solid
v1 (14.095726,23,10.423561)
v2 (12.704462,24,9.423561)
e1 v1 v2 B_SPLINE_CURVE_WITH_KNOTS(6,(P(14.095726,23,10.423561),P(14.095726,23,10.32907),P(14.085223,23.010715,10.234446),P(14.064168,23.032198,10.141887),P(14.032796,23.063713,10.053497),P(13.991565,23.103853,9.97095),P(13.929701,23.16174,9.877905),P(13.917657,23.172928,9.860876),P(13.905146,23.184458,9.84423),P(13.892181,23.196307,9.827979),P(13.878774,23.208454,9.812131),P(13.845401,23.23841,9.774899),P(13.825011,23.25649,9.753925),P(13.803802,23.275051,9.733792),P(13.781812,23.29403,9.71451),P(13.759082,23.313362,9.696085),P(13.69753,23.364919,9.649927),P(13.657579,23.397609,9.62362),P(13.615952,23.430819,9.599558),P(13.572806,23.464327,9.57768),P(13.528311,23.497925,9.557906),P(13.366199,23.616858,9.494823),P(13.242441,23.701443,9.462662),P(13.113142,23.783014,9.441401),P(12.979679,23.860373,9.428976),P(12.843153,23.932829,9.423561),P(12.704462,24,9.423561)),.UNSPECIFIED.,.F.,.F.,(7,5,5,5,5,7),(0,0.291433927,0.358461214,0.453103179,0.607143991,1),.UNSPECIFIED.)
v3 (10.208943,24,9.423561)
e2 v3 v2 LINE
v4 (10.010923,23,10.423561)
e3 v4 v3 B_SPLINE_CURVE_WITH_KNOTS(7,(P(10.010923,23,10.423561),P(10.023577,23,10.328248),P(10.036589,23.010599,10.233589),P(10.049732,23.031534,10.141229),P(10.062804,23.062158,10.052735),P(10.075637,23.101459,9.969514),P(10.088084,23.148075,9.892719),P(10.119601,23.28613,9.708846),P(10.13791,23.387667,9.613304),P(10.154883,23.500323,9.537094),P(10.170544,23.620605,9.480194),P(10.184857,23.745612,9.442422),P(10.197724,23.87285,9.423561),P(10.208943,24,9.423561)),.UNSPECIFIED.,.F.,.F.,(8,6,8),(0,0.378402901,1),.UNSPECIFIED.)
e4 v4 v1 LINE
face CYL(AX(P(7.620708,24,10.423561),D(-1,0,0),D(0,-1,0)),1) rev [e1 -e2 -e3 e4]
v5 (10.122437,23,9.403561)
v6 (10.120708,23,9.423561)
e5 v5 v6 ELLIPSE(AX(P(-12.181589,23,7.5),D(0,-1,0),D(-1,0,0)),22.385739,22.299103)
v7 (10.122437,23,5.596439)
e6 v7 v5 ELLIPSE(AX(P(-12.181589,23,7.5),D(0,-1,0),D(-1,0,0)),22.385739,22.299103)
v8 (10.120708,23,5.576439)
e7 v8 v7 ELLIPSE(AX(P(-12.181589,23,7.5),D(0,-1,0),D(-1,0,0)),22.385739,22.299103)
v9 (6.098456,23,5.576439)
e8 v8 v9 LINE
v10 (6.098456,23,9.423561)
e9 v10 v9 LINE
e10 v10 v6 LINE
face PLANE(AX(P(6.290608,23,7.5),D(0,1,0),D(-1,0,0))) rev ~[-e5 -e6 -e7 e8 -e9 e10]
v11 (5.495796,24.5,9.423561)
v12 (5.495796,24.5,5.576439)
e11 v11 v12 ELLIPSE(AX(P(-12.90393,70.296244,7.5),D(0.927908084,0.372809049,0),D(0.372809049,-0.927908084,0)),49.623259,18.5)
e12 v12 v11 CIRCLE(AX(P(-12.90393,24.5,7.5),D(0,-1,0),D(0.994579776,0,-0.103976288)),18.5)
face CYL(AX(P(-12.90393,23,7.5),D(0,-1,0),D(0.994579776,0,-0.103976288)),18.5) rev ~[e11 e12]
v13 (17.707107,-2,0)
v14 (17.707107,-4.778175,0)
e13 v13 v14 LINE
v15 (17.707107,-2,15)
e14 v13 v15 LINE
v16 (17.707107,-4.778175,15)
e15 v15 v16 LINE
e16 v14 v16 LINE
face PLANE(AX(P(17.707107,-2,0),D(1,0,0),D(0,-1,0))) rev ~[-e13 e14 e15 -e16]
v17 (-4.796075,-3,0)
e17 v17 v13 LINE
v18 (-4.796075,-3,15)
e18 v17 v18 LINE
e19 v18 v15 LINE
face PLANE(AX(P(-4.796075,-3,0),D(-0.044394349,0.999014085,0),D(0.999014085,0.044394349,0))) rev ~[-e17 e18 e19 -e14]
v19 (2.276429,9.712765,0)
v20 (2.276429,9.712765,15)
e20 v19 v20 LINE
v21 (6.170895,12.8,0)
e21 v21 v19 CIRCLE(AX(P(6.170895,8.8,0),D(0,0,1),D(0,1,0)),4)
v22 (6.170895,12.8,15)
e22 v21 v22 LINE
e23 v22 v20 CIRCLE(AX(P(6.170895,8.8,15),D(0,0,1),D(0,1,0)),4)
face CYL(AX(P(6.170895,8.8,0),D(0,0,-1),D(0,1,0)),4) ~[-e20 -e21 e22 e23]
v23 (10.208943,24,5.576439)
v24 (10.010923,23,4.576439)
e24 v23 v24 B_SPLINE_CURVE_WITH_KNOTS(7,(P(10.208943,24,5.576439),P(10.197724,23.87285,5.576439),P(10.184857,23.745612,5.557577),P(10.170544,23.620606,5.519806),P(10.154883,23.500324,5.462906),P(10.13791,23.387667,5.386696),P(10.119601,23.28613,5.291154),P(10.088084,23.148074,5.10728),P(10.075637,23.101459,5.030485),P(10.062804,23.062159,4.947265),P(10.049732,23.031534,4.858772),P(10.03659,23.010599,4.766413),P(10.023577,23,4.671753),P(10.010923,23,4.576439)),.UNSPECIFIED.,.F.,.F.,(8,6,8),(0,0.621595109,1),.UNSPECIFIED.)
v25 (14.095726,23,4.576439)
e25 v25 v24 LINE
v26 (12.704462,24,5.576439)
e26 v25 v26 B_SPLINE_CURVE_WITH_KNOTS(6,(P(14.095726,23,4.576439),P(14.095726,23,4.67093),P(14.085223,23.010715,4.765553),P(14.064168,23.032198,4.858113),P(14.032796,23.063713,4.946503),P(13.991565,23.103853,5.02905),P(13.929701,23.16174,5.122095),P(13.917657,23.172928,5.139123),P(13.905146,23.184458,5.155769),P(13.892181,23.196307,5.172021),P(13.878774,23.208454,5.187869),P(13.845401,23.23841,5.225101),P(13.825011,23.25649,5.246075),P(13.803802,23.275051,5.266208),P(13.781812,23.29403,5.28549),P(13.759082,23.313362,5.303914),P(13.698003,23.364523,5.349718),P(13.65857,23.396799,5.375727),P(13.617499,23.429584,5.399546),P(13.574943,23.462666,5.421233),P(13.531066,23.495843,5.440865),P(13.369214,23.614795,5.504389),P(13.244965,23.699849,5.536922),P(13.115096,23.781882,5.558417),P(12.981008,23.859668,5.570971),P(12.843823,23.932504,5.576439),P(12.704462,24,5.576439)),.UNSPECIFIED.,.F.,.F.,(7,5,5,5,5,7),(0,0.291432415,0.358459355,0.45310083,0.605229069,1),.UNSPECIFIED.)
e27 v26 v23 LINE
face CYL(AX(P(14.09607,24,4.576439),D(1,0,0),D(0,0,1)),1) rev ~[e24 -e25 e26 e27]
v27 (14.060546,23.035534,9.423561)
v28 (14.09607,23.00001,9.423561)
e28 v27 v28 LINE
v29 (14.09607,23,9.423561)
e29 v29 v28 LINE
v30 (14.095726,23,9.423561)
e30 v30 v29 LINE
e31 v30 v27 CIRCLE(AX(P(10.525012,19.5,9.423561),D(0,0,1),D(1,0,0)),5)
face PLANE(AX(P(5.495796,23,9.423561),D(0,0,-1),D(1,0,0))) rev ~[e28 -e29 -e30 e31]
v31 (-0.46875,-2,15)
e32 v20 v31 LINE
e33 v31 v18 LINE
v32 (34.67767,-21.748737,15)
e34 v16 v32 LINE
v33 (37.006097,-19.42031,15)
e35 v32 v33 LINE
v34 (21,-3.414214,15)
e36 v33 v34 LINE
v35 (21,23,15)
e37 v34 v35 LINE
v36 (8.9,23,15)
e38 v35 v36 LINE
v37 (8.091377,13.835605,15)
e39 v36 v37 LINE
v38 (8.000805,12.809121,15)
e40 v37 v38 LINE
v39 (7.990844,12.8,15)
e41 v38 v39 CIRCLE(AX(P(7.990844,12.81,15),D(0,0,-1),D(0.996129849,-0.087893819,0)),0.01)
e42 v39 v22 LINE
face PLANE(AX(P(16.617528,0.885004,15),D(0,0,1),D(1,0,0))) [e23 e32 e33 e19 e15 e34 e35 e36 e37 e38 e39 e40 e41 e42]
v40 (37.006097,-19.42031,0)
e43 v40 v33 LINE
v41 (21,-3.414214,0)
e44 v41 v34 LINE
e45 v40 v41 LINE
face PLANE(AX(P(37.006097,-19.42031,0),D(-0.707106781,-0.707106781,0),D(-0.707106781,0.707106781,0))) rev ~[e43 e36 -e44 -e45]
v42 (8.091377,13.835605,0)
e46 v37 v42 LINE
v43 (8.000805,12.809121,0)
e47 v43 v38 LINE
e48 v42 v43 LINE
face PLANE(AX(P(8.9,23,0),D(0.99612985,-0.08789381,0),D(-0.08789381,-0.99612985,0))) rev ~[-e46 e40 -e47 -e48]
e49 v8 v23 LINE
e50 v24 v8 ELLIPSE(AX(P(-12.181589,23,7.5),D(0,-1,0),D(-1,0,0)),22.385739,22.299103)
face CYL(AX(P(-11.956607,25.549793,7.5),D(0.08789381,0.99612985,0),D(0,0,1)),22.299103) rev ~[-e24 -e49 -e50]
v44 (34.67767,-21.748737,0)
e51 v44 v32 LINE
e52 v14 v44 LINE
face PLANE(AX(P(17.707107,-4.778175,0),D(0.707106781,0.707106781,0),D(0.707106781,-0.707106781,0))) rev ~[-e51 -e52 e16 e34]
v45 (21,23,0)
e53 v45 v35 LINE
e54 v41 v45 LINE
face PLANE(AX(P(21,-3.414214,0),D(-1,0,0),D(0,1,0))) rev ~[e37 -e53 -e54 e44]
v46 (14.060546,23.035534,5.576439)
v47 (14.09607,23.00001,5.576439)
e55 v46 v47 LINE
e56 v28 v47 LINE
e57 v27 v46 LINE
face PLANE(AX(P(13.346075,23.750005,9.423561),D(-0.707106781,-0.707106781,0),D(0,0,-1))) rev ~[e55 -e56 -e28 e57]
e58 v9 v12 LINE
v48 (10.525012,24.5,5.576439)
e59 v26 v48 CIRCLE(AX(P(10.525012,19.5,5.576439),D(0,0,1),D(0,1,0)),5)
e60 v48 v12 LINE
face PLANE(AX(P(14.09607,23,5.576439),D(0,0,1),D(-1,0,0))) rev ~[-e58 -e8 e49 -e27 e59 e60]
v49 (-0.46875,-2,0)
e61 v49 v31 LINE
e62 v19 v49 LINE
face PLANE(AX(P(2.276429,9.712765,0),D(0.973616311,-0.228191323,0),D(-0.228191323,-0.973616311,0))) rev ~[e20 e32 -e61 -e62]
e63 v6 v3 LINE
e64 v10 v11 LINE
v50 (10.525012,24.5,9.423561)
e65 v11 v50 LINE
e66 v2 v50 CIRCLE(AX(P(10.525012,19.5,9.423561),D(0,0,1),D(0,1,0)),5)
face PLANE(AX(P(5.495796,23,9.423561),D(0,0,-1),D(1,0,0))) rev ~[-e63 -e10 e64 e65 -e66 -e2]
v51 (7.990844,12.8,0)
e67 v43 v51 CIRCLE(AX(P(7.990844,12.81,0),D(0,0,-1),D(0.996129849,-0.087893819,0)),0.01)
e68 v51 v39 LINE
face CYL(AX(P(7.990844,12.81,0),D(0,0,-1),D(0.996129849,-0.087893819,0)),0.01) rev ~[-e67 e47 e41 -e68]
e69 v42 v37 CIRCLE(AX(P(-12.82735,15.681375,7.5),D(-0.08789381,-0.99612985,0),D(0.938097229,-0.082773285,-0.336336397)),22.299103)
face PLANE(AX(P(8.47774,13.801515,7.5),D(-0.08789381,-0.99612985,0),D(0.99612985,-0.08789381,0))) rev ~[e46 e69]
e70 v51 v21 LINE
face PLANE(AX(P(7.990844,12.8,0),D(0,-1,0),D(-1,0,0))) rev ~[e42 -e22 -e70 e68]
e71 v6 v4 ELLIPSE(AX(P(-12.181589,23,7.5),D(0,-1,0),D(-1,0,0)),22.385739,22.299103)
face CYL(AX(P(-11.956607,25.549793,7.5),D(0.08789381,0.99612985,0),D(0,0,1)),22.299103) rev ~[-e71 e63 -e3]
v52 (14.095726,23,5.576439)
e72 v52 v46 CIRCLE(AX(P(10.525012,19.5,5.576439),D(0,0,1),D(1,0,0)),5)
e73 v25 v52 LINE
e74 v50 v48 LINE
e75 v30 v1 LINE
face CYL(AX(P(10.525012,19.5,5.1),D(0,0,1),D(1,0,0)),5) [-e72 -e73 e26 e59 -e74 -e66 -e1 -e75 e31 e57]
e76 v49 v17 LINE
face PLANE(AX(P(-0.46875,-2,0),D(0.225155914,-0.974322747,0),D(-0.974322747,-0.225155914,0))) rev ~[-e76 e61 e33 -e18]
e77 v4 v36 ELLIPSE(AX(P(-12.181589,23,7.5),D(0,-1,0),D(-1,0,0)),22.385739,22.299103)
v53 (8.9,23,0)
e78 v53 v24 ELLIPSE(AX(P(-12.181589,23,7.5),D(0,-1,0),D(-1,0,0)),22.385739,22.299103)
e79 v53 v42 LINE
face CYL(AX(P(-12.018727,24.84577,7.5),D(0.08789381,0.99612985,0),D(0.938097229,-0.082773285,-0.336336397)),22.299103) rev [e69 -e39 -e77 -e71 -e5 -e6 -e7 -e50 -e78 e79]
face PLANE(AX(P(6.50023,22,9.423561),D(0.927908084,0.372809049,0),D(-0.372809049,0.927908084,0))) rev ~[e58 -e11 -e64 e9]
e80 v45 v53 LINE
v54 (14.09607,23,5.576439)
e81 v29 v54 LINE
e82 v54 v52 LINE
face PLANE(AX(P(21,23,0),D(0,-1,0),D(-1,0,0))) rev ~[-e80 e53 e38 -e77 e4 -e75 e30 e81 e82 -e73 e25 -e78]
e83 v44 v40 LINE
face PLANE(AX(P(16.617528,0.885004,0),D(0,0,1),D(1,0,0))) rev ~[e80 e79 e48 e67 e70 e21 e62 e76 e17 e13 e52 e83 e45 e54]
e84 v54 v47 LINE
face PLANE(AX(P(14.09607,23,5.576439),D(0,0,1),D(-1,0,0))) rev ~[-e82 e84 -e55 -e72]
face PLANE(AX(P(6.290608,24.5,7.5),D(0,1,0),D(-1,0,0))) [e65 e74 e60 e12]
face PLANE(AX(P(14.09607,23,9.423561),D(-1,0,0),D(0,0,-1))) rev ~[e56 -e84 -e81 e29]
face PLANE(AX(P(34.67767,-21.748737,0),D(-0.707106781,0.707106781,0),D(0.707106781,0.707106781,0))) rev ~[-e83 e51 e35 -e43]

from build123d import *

# Parameters (mm, degrees)
F1_DEPTH      = 15
F4_DEPTH      = 9.2
F4_DEPTH_BACK = 1
F7_DEPTH      = 1.5
F8_SIZE       = 1.49999
F9_R          = 5
F11_DEPTH     = 4
F12_T4_DEPTH  = 6.4753623201
F12_S5_R      = 22.299103121
F12_T6_DEPTH  = 5
F12_S8_R      = 5
F12_T9_DEPTH  = 5
F12_T13_DEPTH = 6.4753623415
F12_S15_R     = 5
F12_T16_DEPTH = 5
F12_S17_R     = 22.299103121
F12_T18_DEPTH = 5


# Not quite as in the source:
# - a fillet or chamfer that OpenCascade refuses, or shapes differently, is made with other operations: its cross-section is extruded or revolved along the edge and cut away or added
# - a fillet or chamfer is up to 0.001 mm smaller than in the source, because OpenCascade refuses the exact size


with BuildPart() as f1:
    # F0 (on Top) → F1 (new body)
    with BuildSketch(Plane.XY):
        with BuildLine():
            Line((37.0060966544, -19.4203102168), (21, -3.4142135624))
            Line((21, -3.4142135624), (21, 23))
            Line((21, 23), (8.9, 23))
            Line((8.9, 23), (8.0008047996, 12.8091210619))
            ThreePointArc((8.0008047996, 12.8091210619), (7.9975966714, 12.8026247244), (7.9908435011, 12.8))
            Line((7.9908435011, 12.8), (6.1708946074, 12.8))
            ThreePointArc((6.1708946074, 12.8), (3.6860466407, 11.9345702389), (2.2764293651, 9.7127652912))
            Line((2.2764293651, 9.7127652912), (-0.46875, -2))
            Line((-0.46875, -2), (-4.7960747033, -3))
            Line((-4.7960747033, -3), (17.7071067812, -2))
            Line((17.7071067812, -2), (17.7071067812, -4.7781745931))
            Line((17.7071067812, -4.7781745931), (34.6776695297, -21.7487373415))
            Line((34.6776695297, -21.7487373415), (37.0060966544, -19.4203102168))
        make_face()
    extrude(amount=F1_DEPTH)

    # F3 (on face) → F4 (cut, two sides)
    with BuildSketch(Plane(origin=(2.0824892704, 23.6015450644, 0), x_dir=(0.99612985, -0.0878938103, 0), z_dir=(-0.0878938103, -0.99612985, 0))) as f4_sk:
        with BuildLine():
            Line((6.8439980284, 15), (6.8439980284, 0))
            ThreePointArc((6.8439980284, 0), (8.1431011494, 7.5), (6.8439980284, 15))
        make_face()
    extrude(amount=F4_DEPTH, mode=Mode.SUBTRACT)
    extrude(f4_sk.sketch, amount=-F4_DEPTH_BACK, mode=Mode.SUBTRACT)

    # F6 (on offset) → F7 (join)
    with BuildSketch(Plane(origin=(0, 23, 0), x_dir=(-1, 0, 0), z_dir=(0, 1, 0))):
        with BuildLine():
            ThreePointArc((-7.0033527857, 9.4235612132), (-7.0960699027, 7.4999998768), (-7.0033527857, 5.5764385404))
            Line((-7.0033527857, 5.5764385404), (-5.4957957644, 5.5764385404))
            ThreePointArc((-5.4957957644, 5.5764385404), (-5.5960699027, 7.4999998768), (-5.4957957644, 9.4235612132))
            Line((-5.4957957644, 9.4235612132), (-7.0033527857, 9.4235612132))
        make_face()
        with BuildLine():
            Line((-14.0960699027, 7.4999998768), (-14.0960699027, 5.5764385404))
            Line((-14.0960699027, 5.5764385404), (-7.0033527857, 5.5764385404))
            ThreePointArc((-7.0033527857, 5.5764385404), (-7.0960699027, 7.4999998768), (-7.0033527857, 9.4235612132))
            Line((-7.0033527857, 9.4235612132), (-14.0960699027, 9.4235612132))
            Line((-14.0960699027, 9.4235612132), (-14.0960699027, 7.4999998768))
        make_face()
    extrude(amount=F7_DEPTH)

    # F8 (size 1.5 in the source; OpenCascade refuses exactly that, so slightly less here)
    f8_edges = [f1.edges().sort_by_distance(p)[0] for p in [
        (14.09607, 24.5, 7.5),
    ]]
    chamfer(f8_edges, length=F8_SIZE)

    # F9
    f9_edges = [f1.edges().sort_by_distance(p)[0] for p in [
        (12.59608, 24.5, 7.5),
    ]]
    fillet(f9_edges, radius=F9_R)

    # F10 (on face) → F11 (cut)
    with BuildSketch(Plane.XY.offset(9.4235612132)):
        Polygon((5.4957957644, 22), (6.5002299745, 22), (5.4957957644, 24.5), align=None)
    extrude(amount=-F11_DEPTH, mode=Mode.SUBTRACT)

    # F12: fillet of radius 1 on 3 edges, made by hand


with BuildPart() as f12_tool2:
    # F12_s3 → F12_t4 (new body)
    with BuildSketch(Plane.YZ.offset(7.6207075826)):
        with BuildLine():
            ThreePointArc((23, 10.4235612132), (23.2928932188, 9.716454432), (24, 9.4235612132))
            Line((24, 9.4235612132), (24, 9.4035612132))
            Line((24, 9.4035612132), (22.98, 9.4035612132))
            Line((22.98, 9.4035612132), (22.98, 10.4235612132))
            Line((22.98, 10.4235612132), (23, 10.4235612132))
        make_face()
    extrude(amount=F12_T4_DEPTH)

    # F12_s5 → F12_t6 (cut, symmetric)
    with BuildSketch(Plane(origin=(2.1446089712, 24.3055683406, 0), x_dir=(0, 0, 1), z_dir=(0.0878938103, 0.99612985, 0))):
        with Locations((7.5, -14.1560019716)):
            Circle(F12_S5_R)
    extrude(amount=F12_T6_DEPTH, both=True, mode=Mode.SUBTRACT)

    split(bisect_by=Plane.XZ.offset(-23), keep=Keep.BOTTOM)

    # F12_s8 → F12_t9 (intersect, symmetric)
    with BuildSketch(Plane.XY.offset(9.9)):
        with Locations((10.5250120908, 19.5)):
            Circle(F12_S8_R)
    extrude(amount=F12_T9_DEPTH, both=True, mode=Mode.INTERSECT)


with BuildPart() as f1_1:
    add(f1.part)

    # F12_t1: union F12_tool2
    add(f12_tool2.part)


with BuildPart() as f12_tool11:
    # F12_s12 → F12_t13 (new body)
    with BuildSketch(Plane.YZ.offset(14.0960699027)):
        with BuildLine():
            ThreePointArc((24, 5.5764385404), (23.2928932188, 5.2835453216), (23, 4.5764385404))
            Line((23, 4.5764385404), (22.98, 4.5764385404))
            Line((22.98, 4.5764385404), (22.98, 5.5964385404))
            Line((22.98, 5.5964385404), (24, 5.5964385404))
            Line((24, 5.5964385404), (24, 5.5764385404))
        make_face()
    extrude(amount=-F12_T13_DEPTH)

    split(bisect_by=Plane.XZ.offset(-23), keep=Keep.BOTTOM)

    # F12_s15 → F12_t16 (intersect, symmetric)
    with BuildSketch(Plane.XY.offset(5.1)):
        with Locations((10.5250120908, 19.5)):
            Circle(F12_S15_R)
    extrude(amount=F12_T16_DEPTH, both=True, mode=Mode.INTERSECT)

    # F12_s17 → F12_t18 (cut, symmetric)
    with BuildSketch(Plane(origin=(2.1446089712, 24.3055683406, 0), x_dir=(0, 0, 1), z_dir=(0.0878938103, 0.99612985, 0))):
        with Locations((7.5, -14.1560019716)):
            Circle(F12_S17_R)
    extrude(amount=F12_T18_DEPTH, both=True, mode=Mode.SUBTRACT)


with BuildPart() as f1_2:
    add(f1_1.part)

    # F12_t10: union F12_tool11
    add(f12_tool11.part)


solid = f1_2.part
